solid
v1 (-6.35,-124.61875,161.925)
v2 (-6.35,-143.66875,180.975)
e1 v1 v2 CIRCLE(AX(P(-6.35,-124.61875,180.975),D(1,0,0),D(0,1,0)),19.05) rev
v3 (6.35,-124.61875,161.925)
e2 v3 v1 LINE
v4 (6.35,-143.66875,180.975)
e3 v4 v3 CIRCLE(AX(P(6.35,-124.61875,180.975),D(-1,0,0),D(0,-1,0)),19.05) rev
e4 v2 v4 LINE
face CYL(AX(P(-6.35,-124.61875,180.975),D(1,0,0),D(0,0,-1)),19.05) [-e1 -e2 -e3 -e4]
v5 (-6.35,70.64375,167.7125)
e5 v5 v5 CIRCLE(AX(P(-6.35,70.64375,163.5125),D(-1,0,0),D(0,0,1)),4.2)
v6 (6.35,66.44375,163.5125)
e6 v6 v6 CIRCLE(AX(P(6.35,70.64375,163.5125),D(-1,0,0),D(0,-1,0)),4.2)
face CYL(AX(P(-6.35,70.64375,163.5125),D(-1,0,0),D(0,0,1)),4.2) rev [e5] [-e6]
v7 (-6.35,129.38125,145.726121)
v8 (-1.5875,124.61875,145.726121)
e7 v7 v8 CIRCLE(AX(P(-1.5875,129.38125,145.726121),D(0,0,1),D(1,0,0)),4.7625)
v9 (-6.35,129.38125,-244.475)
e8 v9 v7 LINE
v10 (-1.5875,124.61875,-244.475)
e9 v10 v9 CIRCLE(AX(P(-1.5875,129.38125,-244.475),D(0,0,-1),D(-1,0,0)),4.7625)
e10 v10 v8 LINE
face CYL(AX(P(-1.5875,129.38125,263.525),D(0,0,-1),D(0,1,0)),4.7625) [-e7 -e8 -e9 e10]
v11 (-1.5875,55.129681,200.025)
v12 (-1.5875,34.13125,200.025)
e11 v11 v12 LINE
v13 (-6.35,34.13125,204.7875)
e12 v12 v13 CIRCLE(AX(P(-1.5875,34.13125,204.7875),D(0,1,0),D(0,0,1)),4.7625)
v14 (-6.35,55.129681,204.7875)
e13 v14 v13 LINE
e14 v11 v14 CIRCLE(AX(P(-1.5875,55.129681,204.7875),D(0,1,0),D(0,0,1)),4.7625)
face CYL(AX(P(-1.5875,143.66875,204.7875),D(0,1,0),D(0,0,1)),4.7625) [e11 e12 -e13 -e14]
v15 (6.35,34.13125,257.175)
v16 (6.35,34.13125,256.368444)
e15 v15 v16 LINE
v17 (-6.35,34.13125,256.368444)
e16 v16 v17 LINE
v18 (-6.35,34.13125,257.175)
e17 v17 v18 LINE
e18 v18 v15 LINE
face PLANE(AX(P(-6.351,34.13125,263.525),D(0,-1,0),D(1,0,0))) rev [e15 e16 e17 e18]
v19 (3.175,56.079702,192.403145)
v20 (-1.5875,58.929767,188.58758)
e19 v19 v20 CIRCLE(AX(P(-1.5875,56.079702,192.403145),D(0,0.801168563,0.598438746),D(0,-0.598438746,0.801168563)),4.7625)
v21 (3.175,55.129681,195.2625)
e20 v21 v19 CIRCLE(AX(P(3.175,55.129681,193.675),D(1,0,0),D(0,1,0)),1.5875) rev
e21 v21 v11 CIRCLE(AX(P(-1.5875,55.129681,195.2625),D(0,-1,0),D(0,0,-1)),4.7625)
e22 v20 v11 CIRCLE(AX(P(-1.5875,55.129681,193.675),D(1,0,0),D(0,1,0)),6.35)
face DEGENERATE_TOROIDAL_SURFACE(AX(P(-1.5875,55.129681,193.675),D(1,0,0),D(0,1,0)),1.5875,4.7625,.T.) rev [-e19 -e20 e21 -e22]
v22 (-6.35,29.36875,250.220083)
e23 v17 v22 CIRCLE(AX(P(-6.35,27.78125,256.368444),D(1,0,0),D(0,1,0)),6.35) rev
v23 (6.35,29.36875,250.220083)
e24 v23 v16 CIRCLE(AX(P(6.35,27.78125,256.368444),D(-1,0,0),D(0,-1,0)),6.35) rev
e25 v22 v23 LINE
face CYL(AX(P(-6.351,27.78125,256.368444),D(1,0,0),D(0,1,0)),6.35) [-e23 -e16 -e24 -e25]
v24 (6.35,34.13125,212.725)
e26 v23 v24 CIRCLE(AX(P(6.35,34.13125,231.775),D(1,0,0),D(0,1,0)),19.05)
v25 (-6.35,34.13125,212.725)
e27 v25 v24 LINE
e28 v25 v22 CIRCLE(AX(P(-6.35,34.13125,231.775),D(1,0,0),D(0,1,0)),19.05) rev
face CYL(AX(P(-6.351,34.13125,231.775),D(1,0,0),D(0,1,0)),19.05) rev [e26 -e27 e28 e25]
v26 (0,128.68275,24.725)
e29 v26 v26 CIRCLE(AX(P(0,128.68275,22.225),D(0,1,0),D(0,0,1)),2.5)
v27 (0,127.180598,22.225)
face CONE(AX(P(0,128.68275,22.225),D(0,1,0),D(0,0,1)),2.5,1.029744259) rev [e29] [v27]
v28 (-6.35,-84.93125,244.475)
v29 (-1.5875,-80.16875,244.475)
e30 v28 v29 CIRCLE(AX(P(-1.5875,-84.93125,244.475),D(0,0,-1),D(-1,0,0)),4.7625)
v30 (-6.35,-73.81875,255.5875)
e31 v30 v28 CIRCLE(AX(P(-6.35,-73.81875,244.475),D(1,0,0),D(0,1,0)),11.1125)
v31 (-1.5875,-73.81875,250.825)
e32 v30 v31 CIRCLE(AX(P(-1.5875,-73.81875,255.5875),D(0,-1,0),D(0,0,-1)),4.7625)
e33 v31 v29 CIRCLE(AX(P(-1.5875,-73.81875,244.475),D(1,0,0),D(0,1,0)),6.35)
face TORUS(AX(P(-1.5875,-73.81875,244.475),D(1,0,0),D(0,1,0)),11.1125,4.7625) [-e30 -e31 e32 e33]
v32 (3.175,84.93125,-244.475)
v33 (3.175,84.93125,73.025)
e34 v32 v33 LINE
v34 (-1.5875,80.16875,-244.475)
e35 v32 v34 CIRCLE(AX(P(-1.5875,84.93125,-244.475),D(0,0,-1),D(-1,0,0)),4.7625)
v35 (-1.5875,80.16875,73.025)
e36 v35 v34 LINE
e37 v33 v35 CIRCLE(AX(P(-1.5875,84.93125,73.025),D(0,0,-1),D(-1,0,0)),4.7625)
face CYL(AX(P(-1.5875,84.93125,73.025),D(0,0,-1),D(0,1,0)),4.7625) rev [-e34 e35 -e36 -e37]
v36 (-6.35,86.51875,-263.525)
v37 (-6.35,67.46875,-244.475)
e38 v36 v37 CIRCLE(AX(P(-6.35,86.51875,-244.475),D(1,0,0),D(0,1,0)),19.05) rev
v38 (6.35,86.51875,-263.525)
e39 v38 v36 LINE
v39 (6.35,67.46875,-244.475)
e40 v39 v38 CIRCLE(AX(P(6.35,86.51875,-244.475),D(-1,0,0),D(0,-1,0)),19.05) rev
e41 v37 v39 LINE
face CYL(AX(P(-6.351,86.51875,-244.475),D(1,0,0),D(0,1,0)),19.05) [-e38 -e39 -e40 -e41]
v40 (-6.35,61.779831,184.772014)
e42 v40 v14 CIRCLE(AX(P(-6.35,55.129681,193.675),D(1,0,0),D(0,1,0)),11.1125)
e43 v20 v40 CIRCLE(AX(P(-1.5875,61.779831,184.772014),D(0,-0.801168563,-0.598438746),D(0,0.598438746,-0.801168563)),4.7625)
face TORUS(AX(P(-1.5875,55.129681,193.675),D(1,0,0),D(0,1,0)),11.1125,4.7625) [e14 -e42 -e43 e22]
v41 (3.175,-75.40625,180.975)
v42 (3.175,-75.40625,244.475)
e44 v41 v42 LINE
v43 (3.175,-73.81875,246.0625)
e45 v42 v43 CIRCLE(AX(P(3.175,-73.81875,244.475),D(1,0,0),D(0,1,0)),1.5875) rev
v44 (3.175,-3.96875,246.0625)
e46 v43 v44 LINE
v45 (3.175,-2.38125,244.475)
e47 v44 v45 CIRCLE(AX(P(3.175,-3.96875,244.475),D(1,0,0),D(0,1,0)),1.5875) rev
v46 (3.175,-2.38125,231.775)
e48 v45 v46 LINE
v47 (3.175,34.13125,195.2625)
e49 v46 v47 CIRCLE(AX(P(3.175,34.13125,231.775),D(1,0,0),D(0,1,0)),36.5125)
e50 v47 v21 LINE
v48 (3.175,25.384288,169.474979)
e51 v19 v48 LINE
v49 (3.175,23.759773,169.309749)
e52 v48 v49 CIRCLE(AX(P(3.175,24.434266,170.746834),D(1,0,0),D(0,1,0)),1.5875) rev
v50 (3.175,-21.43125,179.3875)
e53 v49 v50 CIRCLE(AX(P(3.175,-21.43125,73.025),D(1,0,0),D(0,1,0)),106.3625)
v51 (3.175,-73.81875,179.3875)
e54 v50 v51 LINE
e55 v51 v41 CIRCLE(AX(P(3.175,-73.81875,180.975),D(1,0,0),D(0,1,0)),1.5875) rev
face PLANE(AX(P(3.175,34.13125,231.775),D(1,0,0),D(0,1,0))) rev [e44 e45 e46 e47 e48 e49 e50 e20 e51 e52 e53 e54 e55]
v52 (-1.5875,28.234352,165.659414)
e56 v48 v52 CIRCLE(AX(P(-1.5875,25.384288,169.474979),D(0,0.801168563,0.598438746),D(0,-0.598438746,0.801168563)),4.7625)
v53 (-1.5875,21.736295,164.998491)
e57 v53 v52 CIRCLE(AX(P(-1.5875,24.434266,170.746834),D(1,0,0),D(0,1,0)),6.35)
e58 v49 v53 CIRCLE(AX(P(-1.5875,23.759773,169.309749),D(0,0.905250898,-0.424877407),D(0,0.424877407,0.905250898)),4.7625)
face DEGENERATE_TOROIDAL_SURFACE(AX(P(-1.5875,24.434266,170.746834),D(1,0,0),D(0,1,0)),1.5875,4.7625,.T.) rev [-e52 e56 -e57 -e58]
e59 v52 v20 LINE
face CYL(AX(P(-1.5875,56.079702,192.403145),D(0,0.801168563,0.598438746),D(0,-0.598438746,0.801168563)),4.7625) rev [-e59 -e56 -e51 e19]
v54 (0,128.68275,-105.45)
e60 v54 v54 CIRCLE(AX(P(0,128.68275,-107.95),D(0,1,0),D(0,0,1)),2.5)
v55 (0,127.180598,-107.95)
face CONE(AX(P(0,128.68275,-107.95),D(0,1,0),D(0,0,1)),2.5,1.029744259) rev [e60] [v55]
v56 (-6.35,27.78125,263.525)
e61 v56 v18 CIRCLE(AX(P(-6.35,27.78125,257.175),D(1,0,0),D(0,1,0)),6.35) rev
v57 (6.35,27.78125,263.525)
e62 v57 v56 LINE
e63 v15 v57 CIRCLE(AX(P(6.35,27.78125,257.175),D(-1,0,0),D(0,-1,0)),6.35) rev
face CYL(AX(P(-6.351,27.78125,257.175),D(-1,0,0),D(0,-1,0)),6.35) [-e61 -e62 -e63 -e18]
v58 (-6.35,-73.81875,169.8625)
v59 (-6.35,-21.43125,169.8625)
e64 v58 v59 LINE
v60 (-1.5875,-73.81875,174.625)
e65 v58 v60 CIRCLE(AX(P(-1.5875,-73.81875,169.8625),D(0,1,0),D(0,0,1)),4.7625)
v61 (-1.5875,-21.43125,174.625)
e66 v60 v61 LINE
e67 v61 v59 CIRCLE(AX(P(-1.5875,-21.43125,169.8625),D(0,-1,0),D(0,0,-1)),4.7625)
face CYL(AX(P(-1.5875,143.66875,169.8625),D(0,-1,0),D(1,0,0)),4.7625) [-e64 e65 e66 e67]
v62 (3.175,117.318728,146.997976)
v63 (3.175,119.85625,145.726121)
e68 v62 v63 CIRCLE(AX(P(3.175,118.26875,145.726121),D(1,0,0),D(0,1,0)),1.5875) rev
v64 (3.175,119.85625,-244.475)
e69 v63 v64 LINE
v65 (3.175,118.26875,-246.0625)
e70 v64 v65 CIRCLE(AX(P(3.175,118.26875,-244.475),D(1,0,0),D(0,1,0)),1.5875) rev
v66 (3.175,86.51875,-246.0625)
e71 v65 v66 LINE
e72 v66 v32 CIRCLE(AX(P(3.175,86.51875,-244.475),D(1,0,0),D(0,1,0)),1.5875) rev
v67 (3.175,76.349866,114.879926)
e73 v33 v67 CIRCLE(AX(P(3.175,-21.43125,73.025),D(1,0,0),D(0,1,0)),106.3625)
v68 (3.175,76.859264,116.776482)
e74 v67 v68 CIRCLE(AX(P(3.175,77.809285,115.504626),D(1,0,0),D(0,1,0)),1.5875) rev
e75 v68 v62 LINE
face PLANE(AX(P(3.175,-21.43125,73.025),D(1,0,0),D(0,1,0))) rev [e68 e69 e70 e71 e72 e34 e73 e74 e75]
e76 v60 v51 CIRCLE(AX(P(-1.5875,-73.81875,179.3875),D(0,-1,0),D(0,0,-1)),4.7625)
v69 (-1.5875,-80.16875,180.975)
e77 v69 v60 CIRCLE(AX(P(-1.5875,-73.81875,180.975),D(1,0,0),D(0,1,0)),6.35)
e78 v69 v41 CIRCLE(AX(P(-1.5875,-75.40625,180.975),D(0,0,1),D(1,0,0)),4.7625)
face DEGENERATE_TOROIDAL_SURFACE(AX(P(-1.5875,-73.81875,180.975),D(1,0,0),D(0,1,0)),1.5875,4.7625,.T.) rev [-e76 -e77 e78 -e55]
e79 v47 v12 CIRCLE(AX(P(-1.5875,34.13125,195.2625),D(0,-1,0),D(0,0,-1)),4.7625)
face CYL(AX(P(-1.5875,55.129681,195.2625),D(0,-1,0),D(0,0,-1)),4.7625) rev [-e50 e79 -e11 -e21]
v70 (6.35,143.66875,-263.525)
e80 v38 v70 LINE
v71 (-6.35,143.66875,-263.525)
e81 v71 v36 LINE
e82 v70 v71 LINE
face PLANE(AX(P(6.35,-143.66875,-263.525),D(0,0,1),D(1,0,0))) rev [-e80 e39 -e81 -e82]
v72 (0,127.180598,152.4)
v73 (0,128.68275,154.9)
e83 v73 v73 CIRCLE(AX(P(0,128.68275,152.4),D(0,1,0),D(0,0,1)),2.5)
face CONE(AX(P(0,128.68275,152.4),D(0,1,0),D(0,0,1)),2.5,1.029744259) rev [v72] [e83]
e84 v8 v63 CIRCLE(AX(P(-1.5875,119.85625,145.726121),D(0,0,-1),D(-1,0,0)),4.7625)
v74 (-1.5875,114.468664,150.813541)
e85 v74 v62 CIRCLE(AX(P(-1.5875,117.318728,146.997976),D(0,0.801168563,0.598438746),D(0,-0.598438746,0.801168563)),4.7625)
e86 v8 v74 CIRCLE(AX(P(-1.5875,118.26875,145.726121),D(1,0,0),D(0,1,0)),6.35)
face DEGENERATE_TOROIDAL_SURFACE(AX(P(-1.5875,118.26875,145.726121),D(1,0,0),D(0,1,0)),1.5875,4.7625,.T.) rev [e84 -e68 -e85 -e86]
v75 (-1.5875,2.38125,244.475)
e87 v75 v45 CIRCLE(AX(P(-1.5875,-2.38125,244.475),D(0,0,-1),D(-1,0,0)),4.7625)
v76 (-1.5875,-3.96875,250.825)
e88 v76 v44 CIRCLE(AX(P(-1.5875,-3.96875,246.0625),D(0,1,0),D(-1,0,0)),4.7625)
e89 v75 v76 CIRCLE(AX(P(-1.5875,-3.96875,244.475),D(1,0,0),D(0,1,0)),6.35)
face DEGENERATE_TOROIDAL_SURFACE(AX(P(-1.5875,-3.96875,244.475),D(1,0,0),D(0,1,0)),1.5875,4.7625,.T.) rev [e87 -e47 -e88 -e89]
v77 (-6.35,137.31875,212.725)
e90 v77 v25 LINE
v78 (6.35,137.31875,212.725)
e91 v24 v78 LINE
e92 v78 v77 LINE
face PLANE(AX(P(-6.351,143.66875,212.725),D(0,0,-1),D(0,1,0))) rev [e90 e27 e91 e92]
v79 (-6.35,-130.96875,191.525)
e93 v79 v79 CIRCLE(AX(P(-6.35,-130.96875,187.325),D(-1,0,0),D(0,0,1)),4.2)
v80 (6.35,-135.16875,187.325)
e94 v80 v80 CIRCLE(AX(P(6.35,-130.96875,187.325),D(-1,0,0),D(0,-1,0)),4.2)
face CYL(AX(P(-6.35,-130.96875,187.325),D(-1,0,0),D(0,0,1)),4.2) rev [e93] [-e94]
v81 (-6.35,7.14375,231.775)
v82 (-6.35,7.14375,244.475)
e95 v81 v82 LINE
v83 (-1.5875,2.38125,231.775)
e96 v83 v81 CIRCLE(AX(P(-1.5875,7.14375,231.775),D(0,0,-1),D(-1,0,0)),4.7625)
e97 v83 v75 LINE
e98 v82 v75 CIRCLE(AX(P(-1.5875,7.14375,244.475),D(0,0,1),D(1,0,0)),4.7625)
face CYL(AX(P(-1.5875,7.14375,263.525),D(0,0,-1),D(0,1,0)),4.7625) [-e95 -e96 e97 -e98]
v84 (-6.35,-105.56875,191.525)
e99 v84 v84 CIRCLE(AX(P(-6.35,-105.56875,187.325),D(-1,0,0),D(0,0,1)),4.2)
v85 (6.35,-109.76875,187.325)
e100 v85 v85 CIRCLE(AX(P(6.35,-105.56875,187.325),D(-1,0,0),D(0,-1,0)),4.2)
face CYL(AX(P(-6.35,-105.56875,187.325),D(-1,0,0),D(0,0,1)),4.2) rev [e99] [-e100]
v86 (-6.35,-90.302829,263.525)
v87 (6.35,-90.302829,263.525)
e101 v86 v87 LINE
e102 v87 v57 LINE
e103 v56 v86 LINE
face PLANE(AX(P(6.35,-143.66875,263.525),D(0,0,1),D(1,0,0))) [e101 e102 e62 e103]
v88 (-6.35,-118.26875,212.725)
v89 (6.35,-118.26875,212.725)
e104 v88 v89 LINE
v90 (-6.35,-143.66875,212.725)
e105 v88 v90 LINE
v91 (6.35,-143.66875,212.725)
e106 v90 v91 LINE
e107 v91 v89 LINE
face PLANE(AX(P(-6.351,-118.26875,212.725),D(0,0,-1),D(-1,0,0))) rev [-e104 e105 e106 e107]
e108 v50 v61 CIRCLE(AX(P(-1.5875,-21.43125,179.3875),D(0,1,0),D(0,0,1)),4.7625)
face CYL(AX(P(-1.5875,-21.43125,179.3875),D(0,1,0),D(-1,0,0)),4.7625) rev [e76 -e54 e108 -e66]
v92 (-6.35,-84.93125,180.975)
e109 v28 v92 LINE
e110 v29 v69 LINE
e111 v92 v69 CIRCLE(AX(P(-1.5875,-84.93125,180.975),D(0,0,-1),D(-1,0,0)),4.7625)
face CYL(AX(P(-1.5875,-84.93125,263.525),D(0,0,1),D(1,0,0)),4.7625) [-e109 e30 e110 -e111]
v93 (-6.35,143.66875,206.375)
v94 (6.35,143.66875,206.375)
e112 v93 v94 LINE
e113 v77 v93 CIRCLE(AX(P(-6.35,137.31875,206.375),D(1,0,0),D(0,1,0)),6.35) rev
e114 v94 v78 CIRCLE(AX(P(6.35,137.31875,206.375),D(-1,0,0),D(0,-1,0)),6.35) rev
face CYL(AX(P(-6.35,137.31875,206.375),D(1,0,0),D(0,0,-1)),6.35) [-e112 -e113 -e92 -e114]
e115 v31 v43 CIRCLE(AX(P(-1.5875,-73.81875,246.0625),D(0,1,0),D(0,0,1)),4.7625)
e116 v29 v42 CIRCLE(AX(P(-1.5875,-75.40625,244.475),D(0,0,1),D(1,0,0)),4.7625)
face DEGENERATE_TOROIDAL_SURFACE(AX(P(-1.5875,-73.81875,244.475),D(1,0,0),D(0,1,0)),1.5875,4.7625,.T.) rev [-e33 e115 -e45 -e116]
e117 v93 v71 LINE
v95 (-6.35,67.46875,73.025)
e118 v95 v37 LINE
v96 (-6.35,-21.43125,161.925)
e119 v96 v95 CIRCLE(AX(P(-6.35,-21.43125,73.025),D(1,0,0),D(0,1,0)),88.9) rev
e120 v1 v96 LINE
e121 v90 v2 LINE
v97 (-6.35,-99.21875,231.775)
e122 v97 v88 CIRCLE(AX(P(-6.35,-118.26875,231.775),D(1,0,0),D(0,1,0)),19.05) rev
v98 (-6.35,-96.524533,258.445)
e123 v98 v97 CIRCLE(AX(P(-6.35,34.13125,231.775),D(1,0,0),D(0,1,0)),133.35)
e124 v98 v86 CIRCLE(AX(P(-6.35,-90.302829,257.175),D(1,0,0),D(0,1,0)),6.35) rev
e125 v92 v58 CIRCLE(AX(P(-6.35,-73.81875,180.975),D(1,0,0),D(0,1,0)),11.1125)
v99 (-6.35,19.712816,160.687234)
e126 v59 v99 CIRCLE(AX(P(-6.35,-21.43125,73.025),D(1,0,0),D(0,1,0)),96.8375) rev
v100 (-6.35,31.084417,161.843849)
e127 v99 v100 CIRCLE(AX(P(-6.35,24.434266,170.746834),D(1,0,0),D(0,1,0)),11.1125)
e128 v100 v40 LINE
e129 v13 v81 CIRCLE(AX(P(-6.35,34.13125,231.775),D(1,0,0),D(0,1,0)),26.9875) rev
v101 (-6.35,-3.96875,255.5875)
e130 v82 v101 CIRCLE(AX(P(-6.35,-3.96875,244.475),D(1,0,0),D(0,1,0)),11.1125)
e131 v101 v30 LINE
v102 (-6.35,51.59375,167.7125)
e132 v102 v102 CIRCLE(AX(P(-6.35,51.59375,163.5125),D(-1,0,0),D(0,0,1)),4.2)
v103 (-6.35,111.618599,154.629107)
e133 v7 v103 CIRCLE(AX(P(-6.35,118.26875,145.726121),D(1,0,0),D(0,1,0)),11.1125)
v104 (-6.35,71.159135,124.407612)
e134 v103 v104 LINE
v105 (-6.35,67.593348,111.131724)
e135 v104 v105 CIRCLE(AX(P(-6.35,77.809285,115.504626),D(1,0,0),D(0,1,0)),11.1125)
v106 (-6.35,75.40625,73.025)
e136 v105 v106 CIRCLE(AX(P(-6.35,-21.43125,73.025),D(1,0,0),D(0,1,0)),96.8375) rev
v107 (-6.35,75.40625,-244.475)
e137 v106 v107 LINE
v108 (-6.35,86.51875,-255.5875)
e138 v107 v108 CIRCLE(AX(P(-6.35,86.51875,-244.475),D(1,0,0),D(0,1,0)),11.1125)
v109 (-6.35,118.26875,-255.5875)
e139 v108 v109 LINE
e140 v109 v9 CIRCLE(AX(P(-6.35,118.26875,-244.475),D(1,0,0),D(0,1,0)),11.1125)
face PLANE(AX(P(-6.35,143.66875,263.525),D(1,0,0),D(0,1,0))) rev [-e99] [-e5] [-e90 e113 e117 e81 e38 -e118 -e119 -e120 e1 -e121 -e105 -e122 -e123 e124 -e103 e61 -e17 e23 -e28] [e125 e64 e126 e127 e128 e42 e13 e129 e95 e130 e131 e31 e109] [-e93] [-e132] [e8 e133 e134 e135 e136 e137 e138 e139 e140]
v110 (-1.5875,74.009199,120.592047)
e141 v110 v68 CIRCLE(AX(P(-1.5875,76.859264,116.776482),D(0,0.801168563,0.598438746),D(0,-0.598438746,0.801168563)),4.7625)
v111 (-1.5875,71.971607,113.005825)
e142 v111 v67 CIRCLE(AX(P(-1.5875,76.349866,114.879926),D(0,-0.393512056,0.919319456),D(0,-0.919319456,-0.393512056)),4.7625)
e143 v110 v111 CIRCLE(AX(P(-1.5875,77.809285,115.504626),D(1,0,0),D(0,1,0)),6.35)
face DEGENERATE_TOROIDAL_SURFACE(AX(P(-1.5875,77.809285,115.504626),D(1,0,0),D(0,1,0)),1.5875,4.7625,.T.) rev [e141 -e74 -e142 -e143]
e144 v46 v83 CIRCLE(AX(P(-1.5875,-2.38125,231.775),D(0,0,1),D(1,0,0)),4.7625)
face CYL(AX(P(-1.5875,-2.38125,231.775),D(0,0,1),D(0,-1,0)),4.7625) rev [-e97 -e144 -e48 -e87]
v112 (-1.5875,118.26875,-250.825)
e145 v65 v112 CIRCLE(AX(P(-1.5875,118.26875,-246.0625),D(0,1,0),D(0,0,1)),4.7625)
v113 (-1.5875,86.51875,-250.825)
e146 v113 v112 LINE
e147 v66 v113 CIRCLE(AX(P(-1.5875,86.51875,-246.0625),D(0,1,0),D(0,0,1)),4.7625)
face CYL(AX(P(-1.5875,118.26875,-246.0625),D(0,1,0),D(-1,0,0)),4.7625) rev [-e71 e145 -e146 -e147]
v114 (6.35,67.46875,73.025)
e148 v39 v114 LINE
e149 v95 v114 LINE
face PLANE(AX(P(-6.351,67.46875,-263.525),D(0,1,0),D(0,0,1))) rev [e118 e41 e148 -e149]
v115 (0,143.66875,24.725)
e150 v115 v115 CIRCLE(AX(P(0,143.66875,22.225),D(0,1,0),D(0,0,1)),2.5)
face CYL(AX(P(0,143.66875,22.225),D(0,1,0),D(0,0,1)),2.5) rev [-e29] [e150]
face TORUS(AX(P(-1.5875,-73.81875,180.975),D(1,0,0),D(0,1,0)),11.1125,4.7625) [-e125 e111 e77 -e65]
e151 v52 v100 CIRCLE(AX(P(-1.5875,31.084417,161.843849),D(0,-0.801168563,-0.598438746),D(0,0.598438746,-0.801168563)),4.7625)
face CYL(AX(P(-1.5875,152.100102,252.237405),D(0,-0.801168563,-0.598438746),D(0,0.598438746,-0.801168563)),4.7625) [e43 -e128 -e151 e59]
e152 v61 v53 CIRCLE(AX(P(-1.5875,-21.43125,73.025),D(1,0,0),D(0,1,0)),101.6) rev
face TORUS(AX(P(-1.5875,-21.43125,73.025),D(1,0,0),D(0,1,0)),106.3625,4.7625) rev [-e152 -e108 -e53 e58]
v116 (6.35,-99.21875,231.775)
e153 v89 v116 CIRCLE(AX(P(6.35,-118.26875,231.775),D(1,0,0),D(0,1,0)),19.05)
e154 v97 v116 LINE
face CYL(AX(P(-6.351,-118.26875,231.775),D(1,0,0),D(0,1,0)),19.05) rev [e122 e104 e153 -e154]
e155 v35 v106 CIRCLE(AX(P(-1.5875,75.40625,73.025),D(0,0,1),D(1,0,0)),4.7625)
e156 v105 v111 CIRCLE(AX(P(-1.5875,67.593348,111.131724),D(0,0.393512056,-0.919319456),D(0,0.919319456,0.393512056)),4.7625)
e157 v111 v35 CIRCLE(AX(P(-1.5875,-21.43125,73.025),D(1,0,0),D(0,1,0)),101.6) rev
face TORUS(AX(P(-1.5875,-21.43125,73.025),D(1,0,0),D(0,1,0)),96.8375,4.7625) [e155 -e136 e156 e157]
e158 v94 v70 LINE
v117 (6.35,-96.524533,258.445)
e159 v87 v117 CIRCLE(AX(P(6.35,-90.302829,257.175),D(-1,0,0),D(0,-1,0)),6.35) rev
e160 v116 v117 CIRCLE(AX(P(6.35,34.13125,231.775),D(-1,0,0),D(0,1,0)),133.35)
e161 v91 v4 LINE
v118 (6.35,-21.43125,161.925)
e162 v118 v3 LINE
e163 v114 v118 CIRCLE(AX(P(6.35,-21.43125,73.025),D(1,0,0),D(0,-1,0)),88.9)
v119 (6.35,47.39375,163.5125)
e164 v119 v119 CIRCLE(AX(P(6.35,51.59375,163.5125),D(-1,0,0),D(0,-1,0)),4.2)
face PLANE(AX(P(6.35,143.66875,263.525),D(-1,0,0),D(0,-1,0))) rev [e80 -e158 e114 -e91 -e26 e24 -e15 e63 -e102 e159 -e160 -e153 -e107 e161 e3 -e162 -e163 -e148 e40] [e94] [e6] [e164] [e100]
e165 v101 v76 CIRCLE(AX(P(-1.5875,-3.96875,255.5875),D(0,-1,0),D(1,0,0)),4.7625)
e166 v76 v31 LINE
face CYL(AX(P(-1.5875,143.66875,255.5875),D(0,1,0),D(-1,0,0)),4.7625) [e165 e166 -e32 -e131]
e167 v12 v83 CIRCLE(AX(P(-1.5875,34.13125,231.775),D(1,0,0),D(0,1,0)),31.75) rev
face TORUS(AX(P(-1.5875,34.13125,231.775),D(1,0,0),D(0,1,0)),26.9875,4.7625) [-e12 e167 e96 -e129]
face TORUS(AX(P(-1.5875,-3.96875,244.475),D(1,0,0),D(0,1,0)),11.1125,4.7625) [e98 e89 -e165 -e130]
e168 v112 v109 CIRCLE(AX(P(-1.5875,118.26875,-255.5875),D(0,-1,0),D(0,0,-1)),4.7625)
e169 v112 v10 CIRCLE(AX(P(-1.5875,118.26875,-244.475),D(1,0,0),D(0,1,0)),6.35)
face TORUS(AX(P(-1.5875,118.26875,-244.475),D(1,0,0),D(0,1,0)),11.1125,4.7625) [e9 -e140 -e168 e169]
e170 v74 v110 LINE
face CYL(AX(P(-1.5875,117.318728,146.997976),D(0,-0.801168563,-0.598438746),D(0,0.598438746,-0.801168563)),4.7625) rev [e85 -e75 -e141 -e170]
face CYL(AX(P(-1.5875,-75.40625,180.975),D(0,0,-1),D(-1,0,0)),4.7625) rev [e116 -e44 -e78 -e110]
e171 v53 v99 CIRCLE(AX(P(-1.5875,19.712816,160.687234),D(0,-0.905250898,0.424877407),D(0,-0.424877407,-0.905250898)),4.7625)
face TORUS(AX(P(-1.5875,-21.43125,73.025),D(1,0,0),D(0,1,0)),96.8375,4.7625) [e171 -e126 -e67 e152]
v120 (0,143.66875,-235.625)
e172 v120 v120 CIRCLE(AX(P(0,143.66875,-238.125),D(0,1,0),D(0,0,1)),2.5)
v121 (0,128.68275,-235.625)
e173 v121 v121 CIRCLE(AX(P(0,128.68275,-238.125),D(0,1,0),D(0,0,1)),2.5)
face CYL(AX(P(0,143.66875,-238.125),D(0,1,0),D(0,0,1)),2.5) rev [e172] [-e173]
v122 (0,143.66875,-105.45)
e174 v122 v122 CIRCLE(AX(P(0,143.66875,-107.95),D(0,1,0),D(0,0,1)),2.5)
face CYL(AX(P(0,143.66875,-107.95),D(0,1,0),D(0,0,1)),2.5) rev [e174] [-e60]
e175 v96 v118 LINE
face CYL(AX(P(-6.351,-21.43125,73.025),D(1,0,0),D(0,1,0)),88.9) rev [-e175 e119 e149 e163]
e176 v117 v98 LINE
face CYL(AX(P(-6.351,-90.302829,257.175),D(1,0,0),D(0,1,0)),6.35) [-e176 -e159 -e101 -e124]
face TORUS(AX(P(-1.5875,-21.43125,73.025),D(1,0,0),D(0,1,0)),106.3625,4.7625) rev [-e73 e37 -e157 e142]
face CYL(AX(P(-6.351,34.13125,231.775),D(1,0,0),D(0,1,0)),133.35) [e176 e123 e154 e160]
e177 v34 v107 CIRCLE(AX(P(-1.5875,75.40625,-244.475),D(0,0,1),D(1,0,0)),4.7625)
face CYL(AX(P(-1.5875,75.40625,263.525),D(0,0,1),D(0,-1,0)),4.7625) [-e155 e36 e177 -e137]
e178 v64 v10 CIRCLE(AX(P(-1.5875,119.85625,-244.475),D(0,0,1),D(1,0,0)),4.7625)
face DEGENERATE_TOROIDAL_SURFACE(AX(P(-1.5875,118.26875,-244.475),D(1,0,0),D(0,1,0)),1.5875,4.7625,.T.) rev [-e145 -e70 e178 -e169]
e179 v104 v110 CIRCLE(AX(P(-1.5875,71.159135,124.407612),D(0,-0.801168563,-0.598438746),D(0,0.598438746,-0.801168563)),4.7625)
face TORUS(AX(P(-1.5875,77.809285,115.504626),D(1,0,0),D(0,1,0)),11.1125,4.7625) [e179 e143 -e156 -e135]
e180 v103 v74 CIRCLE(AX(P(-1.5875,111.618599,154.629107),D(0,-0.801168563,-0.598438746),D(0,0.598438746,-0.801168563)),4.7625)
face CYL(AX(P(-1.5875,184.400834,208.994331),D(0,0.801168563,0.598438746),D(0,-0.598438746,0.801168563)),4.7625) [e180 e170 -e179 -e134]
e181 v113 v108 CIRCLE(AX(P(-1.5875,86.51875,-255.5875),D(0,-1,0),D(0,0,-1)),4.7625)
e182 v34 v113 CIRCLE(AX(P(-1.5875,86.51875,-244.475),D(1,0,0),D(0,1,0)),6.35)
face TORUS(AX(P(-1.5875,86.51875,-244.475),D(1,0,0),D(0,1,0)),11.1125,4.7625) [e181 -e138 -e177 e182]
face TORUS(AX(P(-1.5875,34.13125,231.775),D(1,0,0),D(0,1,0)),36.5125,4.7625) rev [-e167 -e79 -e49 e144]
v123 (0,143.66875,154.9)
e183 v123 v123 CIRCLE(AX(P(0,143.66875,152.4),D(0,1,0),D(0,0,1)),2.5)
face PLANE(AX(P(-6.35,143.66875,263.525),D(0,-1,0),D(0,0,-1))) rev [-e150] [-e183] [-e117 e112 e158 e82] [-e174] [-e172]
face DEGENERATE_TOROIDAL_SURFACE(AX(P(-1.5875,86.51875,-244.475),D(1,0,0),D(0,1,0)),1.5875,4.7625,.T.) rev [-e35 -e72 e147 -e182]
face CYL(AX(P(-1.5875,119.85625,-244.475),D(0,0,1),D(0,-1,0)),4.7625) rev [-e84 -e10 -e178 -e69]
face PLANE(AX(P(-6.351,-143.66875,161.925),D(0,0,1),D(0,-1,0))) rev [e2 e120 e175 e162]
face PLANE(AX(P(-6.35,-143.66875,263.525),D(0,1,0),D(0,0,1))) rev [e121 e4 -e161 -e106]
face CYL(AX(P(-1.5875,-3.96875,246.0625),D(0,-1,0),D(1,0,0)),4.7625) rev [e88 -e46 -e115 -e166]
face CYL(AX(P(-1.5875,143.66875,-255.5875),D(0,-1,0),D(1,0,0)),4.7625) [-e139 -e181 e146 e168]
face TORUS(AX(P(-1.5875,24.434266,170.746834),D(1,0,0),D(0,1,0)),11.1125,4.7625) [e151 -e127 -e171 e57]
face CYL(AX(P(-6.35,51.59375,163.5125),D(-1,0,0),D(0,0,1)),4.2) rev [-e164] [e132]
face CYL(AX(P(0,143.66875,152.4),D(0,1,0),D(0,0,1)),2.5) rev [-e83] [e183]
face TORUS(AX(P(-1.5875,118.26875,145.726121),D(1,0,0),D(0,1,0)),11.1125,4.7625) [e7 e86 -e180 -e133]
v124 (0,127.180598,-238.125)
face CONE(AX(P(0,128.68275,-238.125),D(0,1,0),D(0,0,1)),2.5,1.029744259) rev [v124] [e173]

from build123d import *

# Parameters (mm, degrees)
SKETCH1_W                 = 12.7
SKETCH1_H                 = 287.3375
EXTRUDE1_DEPTH            = 263.525
EXTRUDE3_REACH            = 302.412
CUT_EXTRUDE4_REACH        = 302.412
SKETCH10_W                = 12.7
SKETCH10_H                = 109.5375
M6X1_0_TAPPED_HOLE1_D     = 5
M6X1_0_TAPPED_HOLE1_DEPTH = 14.986
M6X1_0_TAPPED_HOLE1_TIP   = 1.502151548
CUT_EXTRUDE1_REACH        = 302.412
FILLET2_R                 = 6.35
CUT_EXTRUDE2_REACH        = 302.412
CUT_EXTRUDE5_DEPTH        = 9.525
FILLET3_R                 = 4.7625
FILLET4_R                 = 19.05
M8_CLEARANCE_HOLE1_D      = 8.4


with BuildPart() as part:
    # Sketch1 → Extrude1 (new, symmetric)
    with BuildSketch(Plane.XY):
        Rectangle(SKETCH1_W, SKETCH1_H)
    extrude(amount=EXTRUDE1_DEPTH, both=True)

    # Sketch3 → Extrude3 (cut, up to next)
    with BuildSketch(Plane(origin=(6.35, 0, 0), x_dir=(0, 0, -1), z_dir=(1, 0, 0)), mode=Mode.PRIVATE) as extrude3_sk1:
        with BuildLine():
            Line((-250.825, 34.13125), (-250.825, 143.66875))
            Line((-250.825, 143.66875), (-212.725, 143.66875))
            Line((-212.725, 143.66875), (-212.725, 34.13125))
            ThreePointArc((-212.725, 34.13125), (-231.775, 15.08125), (-250.825, 34.13125))
        make_face()
    extrude3_tool1 = extrude(extrude3_sk1.sketch, amount=-EXTRUDE3_REACH, mode=Mode.PRIVATE) & part.part
    add(extrude3_tool1.solids().sort_by_distance((6.35, 81.346478, 231.775))[0], mode=Mode.SUBTRACT)

    # Sketch10 → Cut-Extrude4 (cut, up to next)
    with BuildSketch(Plane(origin=(6.35, 0, 0), x_dir=(0, 0, -1), z_dir=(1, 0, 0)), mode=Mode.PRIVATE) as cut_extrude4_sk1:
        with Locations((-257.175, 88.9)):
            Rectangle(SKETCH10_W, SKETCH10_H)
    cut_extrude4_tool1 = extrude(cut_extrude4_sk1.sketch, amount=-CUT_EXTRUDE4_REACH, mode=Mode.PRIVATE) & part.part
    add(cut_extrude4_tool1.solids().sort_by_distance((6.35, 88.9, 257.175))[0], mode=Mode.SUBTRACT)

    # M6x1.0 Tapped Hole1
    with Locations(Plane(origin=(0, 143.66875, 0), x_dir=(-1, 0, 0), z_dir=(0, 1, 0))):
        with Locations((0, -238.125), (0, -107.95), (0, 22.225), (0, 152.4)):
            Hole(M6X1_0_TAPPED_HOLE1_D / 2, depth=M6X1_0_TAPPED_HOLE1_DEPTH)
            with Locations((0, 0, -(M6X1_0_TAPPED_HOLE1_DEPTH + M6X1_0_TAPPED_HOLE1_TIP / 2))):  # 118° drill point
                Cone(0, M6X1_0_TAPPED_HOLE1_D / 2, M6X1_0_TAPPED_HOLE1_TIP, mode=Mode.SUBTRACT)

    # Sketch7 → Cut-Extrude1 (cut, up to next)
    with BuildSketch(Plane(origin=(6.35, 0, 0), x_dir=(0, 0, -1), z_dir=(1, 0, 0)), mode=Mode.PRIVATE) as cut_extrude1_sk1:
        with BuildLine():
            Line((-212.725, -118.26875), (-212.725, -143.66875))
            Line((-212.725, -143.66875), (-263.525, -143.66875))
            Line((-263.525, -143.66875), (-263.525, -95.383845645))
            ThreePointArc((-263.525, -95.383845645), (-247.765379853, -98.256552505), (-231.775, -99.21875))
            ThreePointArc((-231.775, -99.21875), (-218.304615818, -104.798365818), (-212.725, -118.26875))
        make_face()
    cut_extrude1_tool1 = extrude(cut_extrude1_sk1.sketch, amount=-CUT_EXTRUDE1_REACH, mode=Mode.PRIVATE) & part.part
    add(cut_extrude1_tool1.solids().sort_by_distance((6.35, -121.649289, 239.184335))[0], mode=Mode.SUBTRACT)

    # Fillet2
    fillet2_edges = [part.edges().sort_by_distance(p)[0] for p in [
        (0, 34.13125, 250.825),
        (0, 143.66875, 212.725),
        (0, 34.13125, 263.525),
        (0, -95.383845645, 263.525),
    ]]
    fillet(fillet2_edges, radius=FILLET2_R)

    # Sketch8 → Cut-Extrude2 (cut, up to next)
    with BuildSketch(Plane(origin=(6.35, 0, 0), x_dir=(0, 0, -1), z_dir=(1, 0, 0)), mode=Mode.PRIVATE) as cut_extrude2_sk1:
        with BuildLine():
            Line((263.525, 67.46875), (263.525, -143.66875))
            Line((263.525, -143.66875), (-161.925, -143.66875))
            Line((-161.925, -143.66875), (-161.925, -21.43125))
            ThreePointArc((-161.925, -21.43125), (-135.886792847, 41.430542847), (-73.025, 67.46875))
            Line((-73.025, 67.46875), (263.525, 67.46875))
        make_face()
    cut_extrude2_tool1 = extrude(cut_extrude2_sk1.sketch, amount=-CUT_EXTRUDE2_REACH, mode=Mode.PRIVATE) & part.part
    add(cut_extrude2_tool1.solids().sort_by_distance((6.35, -39.749452, -54.511595))[0], mode=Mode.SUBTRACT)

    # Sketch11 → Cut-Extrude5 (cut)
    with BuildSketch(Plane(origin=(-6.35, 0, 0), x_dir=(0, 0, -1), z_dir=(1, 0, 0))):
        with BuildLine():
            Line((-73.025, 80.16875), (244.475, 80.16875))
            ThreePointArc((244.475, 80.16875), (248.965128061, 82.028621939), (250.825, 86.51875))
            Line((250.825, 86.51875), (250.825, 118.26875))
            ThreePointArc((250.825, 118.26875), (248.965128061, 122.758878061), (244.475, 124.61875))
            Line((244.475, 124.61875), (-145.726120962, 124.61875))
            ThreePointArc((-145.726120962, 124.61875), (-151.402961913, 121.114093006), (-150.813541339, 114.46866396))
            Line((-150.813541339, 114.46866396), (-120.592046798, 74.009199222))
            ThreePointArc((-120.592046798, 74.009199222), (-117.151800564, 71.676641677), (-113.005824867, 71.971606717))
            ThreePointArc((-113.005824867, 71.971606717), (-93.431246072, 78.098369316), (-73.025, 80.16875))
        make_face()
        with BuildLine():
            Line((-200.025, 55.129680721), (-200.025, 34.13125))
            ThreePointArc((-200.025, 34.13125), (-209.324359697, 11.680609697), (-231.775, 2.38125))
            Line((-231.775, 2.38125), (-244.475, 2.38125))
            ThreePointArc((-244.475, 2.38125), (-248.965128061, 0.521378061), (-250.825, -3.96875))
            Line((-250.825, -3.96875), (-250.825, -73.81875))
            ThreePointArc((-250.825, -73.81875), (-248.965128061, -78.308878061), (-244.475, -80.16875))
            Line((-244.475, -80.16875), (-180.975, -80.16875))
            ThreePointArc((-180.975, -80.16875), (-176.484871939, -78.308878061), (-174.625, -73.81875))
            Line((-174.625, -73.81875), (-174.625, -21.43125))
            ThreePointArc((-174.625, -21.43125), (-172.189173753, 0.682696818), (-164.998491262, 21.73629458))
            ThreePointArc((-164.998491262, 21.73629458), (-164.42942747, 25.076814823), (-165.659414089, 28.234352156))
            Line((-165.659414089, 28.234352156), (-188.587579623, 58.929766761))
            ThreePointArc((-188.587579623, 58.929766761), (-195.677171397, 61.155774788), (-200.025, 55.129680721))
        make_face()
    extrude(amount=CUT_EXTRUDE5_DEPTH, mode=Mode.SUBTRACT)

    # Fillet3
    fillet3_edges = [part.edges().sort_by_distance(p)[0] for p in [
        (3.175, 124.61875, -49.374439519),
        (3.175, 102.39375, -250.825),
        (3.175, 80.16875, -85.725),
        (-6.35, 124.61875, -49.374439519),
        (-6.35, 102.39375, -250.825),
        (-6.35, 80.16875, -85.725),
        (-6.35, -80.16875, 212.725),
        (-6.35, -38.89375, 250.825),
        (-6.35, 11.680609697, 209.324359697),
        (3.175, -38.89375, 250.825),
        (3.175, -80.16875, 212.725),
        (3.175, 11.680609697, 209.324359697),
        (-6.35, 78.098369316, 93.431246072),
        (-6.35, -47.625, 174.625),
        (-6.35, -78.308878061, 176.484871939),
        (-6.35, 122.758878061, -248.965128061),
        (-6.35, 82.028621939, -248.965128061),
        (3.175, -78.308878061, 176.484871939),
        (3.175, -47.625, 174.625),
        (3.175, 78.098369316, 93.431246072),
        (3.175, 82.028621939, -248.965128061),
        (3.175, 122.758878061, -248.965128061),
        (-6.35, -78.308878061, 248.965128061),
        (3.175, -78.308878061, 248.965128061),
        (3.175, 94.238931591, 135.702794068),
        (-6.35, 71.676641677, 117.151800564),
        (-6.35, 94.238931591, 135.702794068),
        (-6.35, 121.114093006, 151.402961913),
        (3.175, 121.114093006, 151.402961913),
        (3.175, 71.676641677, 117.151800564),
        (-6.35, 0.521378061, 248.965128061),
        (-6.35, 2.38125, 238.125),
        (-6.35, 43.582059459, 177.123496856),
        (-6.35, 25.076814823, 164.42942747),
        (3.175, 2.38125, 238.125),
        (3.175, 0.521378061, 248.965128061),
        (3.175, 0.682696818, 172.189173753),
        (3.175, 25.076814823, 164.42942747),
        (3.175, 43.582059459, 177.123496856),
        (-6.35, 0.682696818, 172.189173753),
        (-6.35, 44.630465361, 200.025),
        (-6.35, 61.155774788, 195.677171397),
        (3.175, 61.155774788, 195.677171397),
        (3.175, 44.630465361, 200.025),
    ]]
    fillet(fillet3_edges, radius=FILLET3_R - 0.0001)  # a hair under: the kernel refuses the full size

    # Fillet4
    fillet4_edges = [part.edges().sort_by_distance(p)[0] for p in [
        (0, -143.66875, 161.925),
        (0, 67.46875, -263.525),
    ]]
    fillet(fillet4_edges, radius=FILLET4_R)

    # M8 Clearance Hole1 (through all)
    with Locations(Plane.ZY.offset(6.35)):
        with Locations((163.5125, 70.64375), (163.5125, 51.59375), (187.325, -105.56875), (187.325, -130.96875)):
            Hole(M8_CLEARANCE_HOLE1_D / 2)


solid = part.part
